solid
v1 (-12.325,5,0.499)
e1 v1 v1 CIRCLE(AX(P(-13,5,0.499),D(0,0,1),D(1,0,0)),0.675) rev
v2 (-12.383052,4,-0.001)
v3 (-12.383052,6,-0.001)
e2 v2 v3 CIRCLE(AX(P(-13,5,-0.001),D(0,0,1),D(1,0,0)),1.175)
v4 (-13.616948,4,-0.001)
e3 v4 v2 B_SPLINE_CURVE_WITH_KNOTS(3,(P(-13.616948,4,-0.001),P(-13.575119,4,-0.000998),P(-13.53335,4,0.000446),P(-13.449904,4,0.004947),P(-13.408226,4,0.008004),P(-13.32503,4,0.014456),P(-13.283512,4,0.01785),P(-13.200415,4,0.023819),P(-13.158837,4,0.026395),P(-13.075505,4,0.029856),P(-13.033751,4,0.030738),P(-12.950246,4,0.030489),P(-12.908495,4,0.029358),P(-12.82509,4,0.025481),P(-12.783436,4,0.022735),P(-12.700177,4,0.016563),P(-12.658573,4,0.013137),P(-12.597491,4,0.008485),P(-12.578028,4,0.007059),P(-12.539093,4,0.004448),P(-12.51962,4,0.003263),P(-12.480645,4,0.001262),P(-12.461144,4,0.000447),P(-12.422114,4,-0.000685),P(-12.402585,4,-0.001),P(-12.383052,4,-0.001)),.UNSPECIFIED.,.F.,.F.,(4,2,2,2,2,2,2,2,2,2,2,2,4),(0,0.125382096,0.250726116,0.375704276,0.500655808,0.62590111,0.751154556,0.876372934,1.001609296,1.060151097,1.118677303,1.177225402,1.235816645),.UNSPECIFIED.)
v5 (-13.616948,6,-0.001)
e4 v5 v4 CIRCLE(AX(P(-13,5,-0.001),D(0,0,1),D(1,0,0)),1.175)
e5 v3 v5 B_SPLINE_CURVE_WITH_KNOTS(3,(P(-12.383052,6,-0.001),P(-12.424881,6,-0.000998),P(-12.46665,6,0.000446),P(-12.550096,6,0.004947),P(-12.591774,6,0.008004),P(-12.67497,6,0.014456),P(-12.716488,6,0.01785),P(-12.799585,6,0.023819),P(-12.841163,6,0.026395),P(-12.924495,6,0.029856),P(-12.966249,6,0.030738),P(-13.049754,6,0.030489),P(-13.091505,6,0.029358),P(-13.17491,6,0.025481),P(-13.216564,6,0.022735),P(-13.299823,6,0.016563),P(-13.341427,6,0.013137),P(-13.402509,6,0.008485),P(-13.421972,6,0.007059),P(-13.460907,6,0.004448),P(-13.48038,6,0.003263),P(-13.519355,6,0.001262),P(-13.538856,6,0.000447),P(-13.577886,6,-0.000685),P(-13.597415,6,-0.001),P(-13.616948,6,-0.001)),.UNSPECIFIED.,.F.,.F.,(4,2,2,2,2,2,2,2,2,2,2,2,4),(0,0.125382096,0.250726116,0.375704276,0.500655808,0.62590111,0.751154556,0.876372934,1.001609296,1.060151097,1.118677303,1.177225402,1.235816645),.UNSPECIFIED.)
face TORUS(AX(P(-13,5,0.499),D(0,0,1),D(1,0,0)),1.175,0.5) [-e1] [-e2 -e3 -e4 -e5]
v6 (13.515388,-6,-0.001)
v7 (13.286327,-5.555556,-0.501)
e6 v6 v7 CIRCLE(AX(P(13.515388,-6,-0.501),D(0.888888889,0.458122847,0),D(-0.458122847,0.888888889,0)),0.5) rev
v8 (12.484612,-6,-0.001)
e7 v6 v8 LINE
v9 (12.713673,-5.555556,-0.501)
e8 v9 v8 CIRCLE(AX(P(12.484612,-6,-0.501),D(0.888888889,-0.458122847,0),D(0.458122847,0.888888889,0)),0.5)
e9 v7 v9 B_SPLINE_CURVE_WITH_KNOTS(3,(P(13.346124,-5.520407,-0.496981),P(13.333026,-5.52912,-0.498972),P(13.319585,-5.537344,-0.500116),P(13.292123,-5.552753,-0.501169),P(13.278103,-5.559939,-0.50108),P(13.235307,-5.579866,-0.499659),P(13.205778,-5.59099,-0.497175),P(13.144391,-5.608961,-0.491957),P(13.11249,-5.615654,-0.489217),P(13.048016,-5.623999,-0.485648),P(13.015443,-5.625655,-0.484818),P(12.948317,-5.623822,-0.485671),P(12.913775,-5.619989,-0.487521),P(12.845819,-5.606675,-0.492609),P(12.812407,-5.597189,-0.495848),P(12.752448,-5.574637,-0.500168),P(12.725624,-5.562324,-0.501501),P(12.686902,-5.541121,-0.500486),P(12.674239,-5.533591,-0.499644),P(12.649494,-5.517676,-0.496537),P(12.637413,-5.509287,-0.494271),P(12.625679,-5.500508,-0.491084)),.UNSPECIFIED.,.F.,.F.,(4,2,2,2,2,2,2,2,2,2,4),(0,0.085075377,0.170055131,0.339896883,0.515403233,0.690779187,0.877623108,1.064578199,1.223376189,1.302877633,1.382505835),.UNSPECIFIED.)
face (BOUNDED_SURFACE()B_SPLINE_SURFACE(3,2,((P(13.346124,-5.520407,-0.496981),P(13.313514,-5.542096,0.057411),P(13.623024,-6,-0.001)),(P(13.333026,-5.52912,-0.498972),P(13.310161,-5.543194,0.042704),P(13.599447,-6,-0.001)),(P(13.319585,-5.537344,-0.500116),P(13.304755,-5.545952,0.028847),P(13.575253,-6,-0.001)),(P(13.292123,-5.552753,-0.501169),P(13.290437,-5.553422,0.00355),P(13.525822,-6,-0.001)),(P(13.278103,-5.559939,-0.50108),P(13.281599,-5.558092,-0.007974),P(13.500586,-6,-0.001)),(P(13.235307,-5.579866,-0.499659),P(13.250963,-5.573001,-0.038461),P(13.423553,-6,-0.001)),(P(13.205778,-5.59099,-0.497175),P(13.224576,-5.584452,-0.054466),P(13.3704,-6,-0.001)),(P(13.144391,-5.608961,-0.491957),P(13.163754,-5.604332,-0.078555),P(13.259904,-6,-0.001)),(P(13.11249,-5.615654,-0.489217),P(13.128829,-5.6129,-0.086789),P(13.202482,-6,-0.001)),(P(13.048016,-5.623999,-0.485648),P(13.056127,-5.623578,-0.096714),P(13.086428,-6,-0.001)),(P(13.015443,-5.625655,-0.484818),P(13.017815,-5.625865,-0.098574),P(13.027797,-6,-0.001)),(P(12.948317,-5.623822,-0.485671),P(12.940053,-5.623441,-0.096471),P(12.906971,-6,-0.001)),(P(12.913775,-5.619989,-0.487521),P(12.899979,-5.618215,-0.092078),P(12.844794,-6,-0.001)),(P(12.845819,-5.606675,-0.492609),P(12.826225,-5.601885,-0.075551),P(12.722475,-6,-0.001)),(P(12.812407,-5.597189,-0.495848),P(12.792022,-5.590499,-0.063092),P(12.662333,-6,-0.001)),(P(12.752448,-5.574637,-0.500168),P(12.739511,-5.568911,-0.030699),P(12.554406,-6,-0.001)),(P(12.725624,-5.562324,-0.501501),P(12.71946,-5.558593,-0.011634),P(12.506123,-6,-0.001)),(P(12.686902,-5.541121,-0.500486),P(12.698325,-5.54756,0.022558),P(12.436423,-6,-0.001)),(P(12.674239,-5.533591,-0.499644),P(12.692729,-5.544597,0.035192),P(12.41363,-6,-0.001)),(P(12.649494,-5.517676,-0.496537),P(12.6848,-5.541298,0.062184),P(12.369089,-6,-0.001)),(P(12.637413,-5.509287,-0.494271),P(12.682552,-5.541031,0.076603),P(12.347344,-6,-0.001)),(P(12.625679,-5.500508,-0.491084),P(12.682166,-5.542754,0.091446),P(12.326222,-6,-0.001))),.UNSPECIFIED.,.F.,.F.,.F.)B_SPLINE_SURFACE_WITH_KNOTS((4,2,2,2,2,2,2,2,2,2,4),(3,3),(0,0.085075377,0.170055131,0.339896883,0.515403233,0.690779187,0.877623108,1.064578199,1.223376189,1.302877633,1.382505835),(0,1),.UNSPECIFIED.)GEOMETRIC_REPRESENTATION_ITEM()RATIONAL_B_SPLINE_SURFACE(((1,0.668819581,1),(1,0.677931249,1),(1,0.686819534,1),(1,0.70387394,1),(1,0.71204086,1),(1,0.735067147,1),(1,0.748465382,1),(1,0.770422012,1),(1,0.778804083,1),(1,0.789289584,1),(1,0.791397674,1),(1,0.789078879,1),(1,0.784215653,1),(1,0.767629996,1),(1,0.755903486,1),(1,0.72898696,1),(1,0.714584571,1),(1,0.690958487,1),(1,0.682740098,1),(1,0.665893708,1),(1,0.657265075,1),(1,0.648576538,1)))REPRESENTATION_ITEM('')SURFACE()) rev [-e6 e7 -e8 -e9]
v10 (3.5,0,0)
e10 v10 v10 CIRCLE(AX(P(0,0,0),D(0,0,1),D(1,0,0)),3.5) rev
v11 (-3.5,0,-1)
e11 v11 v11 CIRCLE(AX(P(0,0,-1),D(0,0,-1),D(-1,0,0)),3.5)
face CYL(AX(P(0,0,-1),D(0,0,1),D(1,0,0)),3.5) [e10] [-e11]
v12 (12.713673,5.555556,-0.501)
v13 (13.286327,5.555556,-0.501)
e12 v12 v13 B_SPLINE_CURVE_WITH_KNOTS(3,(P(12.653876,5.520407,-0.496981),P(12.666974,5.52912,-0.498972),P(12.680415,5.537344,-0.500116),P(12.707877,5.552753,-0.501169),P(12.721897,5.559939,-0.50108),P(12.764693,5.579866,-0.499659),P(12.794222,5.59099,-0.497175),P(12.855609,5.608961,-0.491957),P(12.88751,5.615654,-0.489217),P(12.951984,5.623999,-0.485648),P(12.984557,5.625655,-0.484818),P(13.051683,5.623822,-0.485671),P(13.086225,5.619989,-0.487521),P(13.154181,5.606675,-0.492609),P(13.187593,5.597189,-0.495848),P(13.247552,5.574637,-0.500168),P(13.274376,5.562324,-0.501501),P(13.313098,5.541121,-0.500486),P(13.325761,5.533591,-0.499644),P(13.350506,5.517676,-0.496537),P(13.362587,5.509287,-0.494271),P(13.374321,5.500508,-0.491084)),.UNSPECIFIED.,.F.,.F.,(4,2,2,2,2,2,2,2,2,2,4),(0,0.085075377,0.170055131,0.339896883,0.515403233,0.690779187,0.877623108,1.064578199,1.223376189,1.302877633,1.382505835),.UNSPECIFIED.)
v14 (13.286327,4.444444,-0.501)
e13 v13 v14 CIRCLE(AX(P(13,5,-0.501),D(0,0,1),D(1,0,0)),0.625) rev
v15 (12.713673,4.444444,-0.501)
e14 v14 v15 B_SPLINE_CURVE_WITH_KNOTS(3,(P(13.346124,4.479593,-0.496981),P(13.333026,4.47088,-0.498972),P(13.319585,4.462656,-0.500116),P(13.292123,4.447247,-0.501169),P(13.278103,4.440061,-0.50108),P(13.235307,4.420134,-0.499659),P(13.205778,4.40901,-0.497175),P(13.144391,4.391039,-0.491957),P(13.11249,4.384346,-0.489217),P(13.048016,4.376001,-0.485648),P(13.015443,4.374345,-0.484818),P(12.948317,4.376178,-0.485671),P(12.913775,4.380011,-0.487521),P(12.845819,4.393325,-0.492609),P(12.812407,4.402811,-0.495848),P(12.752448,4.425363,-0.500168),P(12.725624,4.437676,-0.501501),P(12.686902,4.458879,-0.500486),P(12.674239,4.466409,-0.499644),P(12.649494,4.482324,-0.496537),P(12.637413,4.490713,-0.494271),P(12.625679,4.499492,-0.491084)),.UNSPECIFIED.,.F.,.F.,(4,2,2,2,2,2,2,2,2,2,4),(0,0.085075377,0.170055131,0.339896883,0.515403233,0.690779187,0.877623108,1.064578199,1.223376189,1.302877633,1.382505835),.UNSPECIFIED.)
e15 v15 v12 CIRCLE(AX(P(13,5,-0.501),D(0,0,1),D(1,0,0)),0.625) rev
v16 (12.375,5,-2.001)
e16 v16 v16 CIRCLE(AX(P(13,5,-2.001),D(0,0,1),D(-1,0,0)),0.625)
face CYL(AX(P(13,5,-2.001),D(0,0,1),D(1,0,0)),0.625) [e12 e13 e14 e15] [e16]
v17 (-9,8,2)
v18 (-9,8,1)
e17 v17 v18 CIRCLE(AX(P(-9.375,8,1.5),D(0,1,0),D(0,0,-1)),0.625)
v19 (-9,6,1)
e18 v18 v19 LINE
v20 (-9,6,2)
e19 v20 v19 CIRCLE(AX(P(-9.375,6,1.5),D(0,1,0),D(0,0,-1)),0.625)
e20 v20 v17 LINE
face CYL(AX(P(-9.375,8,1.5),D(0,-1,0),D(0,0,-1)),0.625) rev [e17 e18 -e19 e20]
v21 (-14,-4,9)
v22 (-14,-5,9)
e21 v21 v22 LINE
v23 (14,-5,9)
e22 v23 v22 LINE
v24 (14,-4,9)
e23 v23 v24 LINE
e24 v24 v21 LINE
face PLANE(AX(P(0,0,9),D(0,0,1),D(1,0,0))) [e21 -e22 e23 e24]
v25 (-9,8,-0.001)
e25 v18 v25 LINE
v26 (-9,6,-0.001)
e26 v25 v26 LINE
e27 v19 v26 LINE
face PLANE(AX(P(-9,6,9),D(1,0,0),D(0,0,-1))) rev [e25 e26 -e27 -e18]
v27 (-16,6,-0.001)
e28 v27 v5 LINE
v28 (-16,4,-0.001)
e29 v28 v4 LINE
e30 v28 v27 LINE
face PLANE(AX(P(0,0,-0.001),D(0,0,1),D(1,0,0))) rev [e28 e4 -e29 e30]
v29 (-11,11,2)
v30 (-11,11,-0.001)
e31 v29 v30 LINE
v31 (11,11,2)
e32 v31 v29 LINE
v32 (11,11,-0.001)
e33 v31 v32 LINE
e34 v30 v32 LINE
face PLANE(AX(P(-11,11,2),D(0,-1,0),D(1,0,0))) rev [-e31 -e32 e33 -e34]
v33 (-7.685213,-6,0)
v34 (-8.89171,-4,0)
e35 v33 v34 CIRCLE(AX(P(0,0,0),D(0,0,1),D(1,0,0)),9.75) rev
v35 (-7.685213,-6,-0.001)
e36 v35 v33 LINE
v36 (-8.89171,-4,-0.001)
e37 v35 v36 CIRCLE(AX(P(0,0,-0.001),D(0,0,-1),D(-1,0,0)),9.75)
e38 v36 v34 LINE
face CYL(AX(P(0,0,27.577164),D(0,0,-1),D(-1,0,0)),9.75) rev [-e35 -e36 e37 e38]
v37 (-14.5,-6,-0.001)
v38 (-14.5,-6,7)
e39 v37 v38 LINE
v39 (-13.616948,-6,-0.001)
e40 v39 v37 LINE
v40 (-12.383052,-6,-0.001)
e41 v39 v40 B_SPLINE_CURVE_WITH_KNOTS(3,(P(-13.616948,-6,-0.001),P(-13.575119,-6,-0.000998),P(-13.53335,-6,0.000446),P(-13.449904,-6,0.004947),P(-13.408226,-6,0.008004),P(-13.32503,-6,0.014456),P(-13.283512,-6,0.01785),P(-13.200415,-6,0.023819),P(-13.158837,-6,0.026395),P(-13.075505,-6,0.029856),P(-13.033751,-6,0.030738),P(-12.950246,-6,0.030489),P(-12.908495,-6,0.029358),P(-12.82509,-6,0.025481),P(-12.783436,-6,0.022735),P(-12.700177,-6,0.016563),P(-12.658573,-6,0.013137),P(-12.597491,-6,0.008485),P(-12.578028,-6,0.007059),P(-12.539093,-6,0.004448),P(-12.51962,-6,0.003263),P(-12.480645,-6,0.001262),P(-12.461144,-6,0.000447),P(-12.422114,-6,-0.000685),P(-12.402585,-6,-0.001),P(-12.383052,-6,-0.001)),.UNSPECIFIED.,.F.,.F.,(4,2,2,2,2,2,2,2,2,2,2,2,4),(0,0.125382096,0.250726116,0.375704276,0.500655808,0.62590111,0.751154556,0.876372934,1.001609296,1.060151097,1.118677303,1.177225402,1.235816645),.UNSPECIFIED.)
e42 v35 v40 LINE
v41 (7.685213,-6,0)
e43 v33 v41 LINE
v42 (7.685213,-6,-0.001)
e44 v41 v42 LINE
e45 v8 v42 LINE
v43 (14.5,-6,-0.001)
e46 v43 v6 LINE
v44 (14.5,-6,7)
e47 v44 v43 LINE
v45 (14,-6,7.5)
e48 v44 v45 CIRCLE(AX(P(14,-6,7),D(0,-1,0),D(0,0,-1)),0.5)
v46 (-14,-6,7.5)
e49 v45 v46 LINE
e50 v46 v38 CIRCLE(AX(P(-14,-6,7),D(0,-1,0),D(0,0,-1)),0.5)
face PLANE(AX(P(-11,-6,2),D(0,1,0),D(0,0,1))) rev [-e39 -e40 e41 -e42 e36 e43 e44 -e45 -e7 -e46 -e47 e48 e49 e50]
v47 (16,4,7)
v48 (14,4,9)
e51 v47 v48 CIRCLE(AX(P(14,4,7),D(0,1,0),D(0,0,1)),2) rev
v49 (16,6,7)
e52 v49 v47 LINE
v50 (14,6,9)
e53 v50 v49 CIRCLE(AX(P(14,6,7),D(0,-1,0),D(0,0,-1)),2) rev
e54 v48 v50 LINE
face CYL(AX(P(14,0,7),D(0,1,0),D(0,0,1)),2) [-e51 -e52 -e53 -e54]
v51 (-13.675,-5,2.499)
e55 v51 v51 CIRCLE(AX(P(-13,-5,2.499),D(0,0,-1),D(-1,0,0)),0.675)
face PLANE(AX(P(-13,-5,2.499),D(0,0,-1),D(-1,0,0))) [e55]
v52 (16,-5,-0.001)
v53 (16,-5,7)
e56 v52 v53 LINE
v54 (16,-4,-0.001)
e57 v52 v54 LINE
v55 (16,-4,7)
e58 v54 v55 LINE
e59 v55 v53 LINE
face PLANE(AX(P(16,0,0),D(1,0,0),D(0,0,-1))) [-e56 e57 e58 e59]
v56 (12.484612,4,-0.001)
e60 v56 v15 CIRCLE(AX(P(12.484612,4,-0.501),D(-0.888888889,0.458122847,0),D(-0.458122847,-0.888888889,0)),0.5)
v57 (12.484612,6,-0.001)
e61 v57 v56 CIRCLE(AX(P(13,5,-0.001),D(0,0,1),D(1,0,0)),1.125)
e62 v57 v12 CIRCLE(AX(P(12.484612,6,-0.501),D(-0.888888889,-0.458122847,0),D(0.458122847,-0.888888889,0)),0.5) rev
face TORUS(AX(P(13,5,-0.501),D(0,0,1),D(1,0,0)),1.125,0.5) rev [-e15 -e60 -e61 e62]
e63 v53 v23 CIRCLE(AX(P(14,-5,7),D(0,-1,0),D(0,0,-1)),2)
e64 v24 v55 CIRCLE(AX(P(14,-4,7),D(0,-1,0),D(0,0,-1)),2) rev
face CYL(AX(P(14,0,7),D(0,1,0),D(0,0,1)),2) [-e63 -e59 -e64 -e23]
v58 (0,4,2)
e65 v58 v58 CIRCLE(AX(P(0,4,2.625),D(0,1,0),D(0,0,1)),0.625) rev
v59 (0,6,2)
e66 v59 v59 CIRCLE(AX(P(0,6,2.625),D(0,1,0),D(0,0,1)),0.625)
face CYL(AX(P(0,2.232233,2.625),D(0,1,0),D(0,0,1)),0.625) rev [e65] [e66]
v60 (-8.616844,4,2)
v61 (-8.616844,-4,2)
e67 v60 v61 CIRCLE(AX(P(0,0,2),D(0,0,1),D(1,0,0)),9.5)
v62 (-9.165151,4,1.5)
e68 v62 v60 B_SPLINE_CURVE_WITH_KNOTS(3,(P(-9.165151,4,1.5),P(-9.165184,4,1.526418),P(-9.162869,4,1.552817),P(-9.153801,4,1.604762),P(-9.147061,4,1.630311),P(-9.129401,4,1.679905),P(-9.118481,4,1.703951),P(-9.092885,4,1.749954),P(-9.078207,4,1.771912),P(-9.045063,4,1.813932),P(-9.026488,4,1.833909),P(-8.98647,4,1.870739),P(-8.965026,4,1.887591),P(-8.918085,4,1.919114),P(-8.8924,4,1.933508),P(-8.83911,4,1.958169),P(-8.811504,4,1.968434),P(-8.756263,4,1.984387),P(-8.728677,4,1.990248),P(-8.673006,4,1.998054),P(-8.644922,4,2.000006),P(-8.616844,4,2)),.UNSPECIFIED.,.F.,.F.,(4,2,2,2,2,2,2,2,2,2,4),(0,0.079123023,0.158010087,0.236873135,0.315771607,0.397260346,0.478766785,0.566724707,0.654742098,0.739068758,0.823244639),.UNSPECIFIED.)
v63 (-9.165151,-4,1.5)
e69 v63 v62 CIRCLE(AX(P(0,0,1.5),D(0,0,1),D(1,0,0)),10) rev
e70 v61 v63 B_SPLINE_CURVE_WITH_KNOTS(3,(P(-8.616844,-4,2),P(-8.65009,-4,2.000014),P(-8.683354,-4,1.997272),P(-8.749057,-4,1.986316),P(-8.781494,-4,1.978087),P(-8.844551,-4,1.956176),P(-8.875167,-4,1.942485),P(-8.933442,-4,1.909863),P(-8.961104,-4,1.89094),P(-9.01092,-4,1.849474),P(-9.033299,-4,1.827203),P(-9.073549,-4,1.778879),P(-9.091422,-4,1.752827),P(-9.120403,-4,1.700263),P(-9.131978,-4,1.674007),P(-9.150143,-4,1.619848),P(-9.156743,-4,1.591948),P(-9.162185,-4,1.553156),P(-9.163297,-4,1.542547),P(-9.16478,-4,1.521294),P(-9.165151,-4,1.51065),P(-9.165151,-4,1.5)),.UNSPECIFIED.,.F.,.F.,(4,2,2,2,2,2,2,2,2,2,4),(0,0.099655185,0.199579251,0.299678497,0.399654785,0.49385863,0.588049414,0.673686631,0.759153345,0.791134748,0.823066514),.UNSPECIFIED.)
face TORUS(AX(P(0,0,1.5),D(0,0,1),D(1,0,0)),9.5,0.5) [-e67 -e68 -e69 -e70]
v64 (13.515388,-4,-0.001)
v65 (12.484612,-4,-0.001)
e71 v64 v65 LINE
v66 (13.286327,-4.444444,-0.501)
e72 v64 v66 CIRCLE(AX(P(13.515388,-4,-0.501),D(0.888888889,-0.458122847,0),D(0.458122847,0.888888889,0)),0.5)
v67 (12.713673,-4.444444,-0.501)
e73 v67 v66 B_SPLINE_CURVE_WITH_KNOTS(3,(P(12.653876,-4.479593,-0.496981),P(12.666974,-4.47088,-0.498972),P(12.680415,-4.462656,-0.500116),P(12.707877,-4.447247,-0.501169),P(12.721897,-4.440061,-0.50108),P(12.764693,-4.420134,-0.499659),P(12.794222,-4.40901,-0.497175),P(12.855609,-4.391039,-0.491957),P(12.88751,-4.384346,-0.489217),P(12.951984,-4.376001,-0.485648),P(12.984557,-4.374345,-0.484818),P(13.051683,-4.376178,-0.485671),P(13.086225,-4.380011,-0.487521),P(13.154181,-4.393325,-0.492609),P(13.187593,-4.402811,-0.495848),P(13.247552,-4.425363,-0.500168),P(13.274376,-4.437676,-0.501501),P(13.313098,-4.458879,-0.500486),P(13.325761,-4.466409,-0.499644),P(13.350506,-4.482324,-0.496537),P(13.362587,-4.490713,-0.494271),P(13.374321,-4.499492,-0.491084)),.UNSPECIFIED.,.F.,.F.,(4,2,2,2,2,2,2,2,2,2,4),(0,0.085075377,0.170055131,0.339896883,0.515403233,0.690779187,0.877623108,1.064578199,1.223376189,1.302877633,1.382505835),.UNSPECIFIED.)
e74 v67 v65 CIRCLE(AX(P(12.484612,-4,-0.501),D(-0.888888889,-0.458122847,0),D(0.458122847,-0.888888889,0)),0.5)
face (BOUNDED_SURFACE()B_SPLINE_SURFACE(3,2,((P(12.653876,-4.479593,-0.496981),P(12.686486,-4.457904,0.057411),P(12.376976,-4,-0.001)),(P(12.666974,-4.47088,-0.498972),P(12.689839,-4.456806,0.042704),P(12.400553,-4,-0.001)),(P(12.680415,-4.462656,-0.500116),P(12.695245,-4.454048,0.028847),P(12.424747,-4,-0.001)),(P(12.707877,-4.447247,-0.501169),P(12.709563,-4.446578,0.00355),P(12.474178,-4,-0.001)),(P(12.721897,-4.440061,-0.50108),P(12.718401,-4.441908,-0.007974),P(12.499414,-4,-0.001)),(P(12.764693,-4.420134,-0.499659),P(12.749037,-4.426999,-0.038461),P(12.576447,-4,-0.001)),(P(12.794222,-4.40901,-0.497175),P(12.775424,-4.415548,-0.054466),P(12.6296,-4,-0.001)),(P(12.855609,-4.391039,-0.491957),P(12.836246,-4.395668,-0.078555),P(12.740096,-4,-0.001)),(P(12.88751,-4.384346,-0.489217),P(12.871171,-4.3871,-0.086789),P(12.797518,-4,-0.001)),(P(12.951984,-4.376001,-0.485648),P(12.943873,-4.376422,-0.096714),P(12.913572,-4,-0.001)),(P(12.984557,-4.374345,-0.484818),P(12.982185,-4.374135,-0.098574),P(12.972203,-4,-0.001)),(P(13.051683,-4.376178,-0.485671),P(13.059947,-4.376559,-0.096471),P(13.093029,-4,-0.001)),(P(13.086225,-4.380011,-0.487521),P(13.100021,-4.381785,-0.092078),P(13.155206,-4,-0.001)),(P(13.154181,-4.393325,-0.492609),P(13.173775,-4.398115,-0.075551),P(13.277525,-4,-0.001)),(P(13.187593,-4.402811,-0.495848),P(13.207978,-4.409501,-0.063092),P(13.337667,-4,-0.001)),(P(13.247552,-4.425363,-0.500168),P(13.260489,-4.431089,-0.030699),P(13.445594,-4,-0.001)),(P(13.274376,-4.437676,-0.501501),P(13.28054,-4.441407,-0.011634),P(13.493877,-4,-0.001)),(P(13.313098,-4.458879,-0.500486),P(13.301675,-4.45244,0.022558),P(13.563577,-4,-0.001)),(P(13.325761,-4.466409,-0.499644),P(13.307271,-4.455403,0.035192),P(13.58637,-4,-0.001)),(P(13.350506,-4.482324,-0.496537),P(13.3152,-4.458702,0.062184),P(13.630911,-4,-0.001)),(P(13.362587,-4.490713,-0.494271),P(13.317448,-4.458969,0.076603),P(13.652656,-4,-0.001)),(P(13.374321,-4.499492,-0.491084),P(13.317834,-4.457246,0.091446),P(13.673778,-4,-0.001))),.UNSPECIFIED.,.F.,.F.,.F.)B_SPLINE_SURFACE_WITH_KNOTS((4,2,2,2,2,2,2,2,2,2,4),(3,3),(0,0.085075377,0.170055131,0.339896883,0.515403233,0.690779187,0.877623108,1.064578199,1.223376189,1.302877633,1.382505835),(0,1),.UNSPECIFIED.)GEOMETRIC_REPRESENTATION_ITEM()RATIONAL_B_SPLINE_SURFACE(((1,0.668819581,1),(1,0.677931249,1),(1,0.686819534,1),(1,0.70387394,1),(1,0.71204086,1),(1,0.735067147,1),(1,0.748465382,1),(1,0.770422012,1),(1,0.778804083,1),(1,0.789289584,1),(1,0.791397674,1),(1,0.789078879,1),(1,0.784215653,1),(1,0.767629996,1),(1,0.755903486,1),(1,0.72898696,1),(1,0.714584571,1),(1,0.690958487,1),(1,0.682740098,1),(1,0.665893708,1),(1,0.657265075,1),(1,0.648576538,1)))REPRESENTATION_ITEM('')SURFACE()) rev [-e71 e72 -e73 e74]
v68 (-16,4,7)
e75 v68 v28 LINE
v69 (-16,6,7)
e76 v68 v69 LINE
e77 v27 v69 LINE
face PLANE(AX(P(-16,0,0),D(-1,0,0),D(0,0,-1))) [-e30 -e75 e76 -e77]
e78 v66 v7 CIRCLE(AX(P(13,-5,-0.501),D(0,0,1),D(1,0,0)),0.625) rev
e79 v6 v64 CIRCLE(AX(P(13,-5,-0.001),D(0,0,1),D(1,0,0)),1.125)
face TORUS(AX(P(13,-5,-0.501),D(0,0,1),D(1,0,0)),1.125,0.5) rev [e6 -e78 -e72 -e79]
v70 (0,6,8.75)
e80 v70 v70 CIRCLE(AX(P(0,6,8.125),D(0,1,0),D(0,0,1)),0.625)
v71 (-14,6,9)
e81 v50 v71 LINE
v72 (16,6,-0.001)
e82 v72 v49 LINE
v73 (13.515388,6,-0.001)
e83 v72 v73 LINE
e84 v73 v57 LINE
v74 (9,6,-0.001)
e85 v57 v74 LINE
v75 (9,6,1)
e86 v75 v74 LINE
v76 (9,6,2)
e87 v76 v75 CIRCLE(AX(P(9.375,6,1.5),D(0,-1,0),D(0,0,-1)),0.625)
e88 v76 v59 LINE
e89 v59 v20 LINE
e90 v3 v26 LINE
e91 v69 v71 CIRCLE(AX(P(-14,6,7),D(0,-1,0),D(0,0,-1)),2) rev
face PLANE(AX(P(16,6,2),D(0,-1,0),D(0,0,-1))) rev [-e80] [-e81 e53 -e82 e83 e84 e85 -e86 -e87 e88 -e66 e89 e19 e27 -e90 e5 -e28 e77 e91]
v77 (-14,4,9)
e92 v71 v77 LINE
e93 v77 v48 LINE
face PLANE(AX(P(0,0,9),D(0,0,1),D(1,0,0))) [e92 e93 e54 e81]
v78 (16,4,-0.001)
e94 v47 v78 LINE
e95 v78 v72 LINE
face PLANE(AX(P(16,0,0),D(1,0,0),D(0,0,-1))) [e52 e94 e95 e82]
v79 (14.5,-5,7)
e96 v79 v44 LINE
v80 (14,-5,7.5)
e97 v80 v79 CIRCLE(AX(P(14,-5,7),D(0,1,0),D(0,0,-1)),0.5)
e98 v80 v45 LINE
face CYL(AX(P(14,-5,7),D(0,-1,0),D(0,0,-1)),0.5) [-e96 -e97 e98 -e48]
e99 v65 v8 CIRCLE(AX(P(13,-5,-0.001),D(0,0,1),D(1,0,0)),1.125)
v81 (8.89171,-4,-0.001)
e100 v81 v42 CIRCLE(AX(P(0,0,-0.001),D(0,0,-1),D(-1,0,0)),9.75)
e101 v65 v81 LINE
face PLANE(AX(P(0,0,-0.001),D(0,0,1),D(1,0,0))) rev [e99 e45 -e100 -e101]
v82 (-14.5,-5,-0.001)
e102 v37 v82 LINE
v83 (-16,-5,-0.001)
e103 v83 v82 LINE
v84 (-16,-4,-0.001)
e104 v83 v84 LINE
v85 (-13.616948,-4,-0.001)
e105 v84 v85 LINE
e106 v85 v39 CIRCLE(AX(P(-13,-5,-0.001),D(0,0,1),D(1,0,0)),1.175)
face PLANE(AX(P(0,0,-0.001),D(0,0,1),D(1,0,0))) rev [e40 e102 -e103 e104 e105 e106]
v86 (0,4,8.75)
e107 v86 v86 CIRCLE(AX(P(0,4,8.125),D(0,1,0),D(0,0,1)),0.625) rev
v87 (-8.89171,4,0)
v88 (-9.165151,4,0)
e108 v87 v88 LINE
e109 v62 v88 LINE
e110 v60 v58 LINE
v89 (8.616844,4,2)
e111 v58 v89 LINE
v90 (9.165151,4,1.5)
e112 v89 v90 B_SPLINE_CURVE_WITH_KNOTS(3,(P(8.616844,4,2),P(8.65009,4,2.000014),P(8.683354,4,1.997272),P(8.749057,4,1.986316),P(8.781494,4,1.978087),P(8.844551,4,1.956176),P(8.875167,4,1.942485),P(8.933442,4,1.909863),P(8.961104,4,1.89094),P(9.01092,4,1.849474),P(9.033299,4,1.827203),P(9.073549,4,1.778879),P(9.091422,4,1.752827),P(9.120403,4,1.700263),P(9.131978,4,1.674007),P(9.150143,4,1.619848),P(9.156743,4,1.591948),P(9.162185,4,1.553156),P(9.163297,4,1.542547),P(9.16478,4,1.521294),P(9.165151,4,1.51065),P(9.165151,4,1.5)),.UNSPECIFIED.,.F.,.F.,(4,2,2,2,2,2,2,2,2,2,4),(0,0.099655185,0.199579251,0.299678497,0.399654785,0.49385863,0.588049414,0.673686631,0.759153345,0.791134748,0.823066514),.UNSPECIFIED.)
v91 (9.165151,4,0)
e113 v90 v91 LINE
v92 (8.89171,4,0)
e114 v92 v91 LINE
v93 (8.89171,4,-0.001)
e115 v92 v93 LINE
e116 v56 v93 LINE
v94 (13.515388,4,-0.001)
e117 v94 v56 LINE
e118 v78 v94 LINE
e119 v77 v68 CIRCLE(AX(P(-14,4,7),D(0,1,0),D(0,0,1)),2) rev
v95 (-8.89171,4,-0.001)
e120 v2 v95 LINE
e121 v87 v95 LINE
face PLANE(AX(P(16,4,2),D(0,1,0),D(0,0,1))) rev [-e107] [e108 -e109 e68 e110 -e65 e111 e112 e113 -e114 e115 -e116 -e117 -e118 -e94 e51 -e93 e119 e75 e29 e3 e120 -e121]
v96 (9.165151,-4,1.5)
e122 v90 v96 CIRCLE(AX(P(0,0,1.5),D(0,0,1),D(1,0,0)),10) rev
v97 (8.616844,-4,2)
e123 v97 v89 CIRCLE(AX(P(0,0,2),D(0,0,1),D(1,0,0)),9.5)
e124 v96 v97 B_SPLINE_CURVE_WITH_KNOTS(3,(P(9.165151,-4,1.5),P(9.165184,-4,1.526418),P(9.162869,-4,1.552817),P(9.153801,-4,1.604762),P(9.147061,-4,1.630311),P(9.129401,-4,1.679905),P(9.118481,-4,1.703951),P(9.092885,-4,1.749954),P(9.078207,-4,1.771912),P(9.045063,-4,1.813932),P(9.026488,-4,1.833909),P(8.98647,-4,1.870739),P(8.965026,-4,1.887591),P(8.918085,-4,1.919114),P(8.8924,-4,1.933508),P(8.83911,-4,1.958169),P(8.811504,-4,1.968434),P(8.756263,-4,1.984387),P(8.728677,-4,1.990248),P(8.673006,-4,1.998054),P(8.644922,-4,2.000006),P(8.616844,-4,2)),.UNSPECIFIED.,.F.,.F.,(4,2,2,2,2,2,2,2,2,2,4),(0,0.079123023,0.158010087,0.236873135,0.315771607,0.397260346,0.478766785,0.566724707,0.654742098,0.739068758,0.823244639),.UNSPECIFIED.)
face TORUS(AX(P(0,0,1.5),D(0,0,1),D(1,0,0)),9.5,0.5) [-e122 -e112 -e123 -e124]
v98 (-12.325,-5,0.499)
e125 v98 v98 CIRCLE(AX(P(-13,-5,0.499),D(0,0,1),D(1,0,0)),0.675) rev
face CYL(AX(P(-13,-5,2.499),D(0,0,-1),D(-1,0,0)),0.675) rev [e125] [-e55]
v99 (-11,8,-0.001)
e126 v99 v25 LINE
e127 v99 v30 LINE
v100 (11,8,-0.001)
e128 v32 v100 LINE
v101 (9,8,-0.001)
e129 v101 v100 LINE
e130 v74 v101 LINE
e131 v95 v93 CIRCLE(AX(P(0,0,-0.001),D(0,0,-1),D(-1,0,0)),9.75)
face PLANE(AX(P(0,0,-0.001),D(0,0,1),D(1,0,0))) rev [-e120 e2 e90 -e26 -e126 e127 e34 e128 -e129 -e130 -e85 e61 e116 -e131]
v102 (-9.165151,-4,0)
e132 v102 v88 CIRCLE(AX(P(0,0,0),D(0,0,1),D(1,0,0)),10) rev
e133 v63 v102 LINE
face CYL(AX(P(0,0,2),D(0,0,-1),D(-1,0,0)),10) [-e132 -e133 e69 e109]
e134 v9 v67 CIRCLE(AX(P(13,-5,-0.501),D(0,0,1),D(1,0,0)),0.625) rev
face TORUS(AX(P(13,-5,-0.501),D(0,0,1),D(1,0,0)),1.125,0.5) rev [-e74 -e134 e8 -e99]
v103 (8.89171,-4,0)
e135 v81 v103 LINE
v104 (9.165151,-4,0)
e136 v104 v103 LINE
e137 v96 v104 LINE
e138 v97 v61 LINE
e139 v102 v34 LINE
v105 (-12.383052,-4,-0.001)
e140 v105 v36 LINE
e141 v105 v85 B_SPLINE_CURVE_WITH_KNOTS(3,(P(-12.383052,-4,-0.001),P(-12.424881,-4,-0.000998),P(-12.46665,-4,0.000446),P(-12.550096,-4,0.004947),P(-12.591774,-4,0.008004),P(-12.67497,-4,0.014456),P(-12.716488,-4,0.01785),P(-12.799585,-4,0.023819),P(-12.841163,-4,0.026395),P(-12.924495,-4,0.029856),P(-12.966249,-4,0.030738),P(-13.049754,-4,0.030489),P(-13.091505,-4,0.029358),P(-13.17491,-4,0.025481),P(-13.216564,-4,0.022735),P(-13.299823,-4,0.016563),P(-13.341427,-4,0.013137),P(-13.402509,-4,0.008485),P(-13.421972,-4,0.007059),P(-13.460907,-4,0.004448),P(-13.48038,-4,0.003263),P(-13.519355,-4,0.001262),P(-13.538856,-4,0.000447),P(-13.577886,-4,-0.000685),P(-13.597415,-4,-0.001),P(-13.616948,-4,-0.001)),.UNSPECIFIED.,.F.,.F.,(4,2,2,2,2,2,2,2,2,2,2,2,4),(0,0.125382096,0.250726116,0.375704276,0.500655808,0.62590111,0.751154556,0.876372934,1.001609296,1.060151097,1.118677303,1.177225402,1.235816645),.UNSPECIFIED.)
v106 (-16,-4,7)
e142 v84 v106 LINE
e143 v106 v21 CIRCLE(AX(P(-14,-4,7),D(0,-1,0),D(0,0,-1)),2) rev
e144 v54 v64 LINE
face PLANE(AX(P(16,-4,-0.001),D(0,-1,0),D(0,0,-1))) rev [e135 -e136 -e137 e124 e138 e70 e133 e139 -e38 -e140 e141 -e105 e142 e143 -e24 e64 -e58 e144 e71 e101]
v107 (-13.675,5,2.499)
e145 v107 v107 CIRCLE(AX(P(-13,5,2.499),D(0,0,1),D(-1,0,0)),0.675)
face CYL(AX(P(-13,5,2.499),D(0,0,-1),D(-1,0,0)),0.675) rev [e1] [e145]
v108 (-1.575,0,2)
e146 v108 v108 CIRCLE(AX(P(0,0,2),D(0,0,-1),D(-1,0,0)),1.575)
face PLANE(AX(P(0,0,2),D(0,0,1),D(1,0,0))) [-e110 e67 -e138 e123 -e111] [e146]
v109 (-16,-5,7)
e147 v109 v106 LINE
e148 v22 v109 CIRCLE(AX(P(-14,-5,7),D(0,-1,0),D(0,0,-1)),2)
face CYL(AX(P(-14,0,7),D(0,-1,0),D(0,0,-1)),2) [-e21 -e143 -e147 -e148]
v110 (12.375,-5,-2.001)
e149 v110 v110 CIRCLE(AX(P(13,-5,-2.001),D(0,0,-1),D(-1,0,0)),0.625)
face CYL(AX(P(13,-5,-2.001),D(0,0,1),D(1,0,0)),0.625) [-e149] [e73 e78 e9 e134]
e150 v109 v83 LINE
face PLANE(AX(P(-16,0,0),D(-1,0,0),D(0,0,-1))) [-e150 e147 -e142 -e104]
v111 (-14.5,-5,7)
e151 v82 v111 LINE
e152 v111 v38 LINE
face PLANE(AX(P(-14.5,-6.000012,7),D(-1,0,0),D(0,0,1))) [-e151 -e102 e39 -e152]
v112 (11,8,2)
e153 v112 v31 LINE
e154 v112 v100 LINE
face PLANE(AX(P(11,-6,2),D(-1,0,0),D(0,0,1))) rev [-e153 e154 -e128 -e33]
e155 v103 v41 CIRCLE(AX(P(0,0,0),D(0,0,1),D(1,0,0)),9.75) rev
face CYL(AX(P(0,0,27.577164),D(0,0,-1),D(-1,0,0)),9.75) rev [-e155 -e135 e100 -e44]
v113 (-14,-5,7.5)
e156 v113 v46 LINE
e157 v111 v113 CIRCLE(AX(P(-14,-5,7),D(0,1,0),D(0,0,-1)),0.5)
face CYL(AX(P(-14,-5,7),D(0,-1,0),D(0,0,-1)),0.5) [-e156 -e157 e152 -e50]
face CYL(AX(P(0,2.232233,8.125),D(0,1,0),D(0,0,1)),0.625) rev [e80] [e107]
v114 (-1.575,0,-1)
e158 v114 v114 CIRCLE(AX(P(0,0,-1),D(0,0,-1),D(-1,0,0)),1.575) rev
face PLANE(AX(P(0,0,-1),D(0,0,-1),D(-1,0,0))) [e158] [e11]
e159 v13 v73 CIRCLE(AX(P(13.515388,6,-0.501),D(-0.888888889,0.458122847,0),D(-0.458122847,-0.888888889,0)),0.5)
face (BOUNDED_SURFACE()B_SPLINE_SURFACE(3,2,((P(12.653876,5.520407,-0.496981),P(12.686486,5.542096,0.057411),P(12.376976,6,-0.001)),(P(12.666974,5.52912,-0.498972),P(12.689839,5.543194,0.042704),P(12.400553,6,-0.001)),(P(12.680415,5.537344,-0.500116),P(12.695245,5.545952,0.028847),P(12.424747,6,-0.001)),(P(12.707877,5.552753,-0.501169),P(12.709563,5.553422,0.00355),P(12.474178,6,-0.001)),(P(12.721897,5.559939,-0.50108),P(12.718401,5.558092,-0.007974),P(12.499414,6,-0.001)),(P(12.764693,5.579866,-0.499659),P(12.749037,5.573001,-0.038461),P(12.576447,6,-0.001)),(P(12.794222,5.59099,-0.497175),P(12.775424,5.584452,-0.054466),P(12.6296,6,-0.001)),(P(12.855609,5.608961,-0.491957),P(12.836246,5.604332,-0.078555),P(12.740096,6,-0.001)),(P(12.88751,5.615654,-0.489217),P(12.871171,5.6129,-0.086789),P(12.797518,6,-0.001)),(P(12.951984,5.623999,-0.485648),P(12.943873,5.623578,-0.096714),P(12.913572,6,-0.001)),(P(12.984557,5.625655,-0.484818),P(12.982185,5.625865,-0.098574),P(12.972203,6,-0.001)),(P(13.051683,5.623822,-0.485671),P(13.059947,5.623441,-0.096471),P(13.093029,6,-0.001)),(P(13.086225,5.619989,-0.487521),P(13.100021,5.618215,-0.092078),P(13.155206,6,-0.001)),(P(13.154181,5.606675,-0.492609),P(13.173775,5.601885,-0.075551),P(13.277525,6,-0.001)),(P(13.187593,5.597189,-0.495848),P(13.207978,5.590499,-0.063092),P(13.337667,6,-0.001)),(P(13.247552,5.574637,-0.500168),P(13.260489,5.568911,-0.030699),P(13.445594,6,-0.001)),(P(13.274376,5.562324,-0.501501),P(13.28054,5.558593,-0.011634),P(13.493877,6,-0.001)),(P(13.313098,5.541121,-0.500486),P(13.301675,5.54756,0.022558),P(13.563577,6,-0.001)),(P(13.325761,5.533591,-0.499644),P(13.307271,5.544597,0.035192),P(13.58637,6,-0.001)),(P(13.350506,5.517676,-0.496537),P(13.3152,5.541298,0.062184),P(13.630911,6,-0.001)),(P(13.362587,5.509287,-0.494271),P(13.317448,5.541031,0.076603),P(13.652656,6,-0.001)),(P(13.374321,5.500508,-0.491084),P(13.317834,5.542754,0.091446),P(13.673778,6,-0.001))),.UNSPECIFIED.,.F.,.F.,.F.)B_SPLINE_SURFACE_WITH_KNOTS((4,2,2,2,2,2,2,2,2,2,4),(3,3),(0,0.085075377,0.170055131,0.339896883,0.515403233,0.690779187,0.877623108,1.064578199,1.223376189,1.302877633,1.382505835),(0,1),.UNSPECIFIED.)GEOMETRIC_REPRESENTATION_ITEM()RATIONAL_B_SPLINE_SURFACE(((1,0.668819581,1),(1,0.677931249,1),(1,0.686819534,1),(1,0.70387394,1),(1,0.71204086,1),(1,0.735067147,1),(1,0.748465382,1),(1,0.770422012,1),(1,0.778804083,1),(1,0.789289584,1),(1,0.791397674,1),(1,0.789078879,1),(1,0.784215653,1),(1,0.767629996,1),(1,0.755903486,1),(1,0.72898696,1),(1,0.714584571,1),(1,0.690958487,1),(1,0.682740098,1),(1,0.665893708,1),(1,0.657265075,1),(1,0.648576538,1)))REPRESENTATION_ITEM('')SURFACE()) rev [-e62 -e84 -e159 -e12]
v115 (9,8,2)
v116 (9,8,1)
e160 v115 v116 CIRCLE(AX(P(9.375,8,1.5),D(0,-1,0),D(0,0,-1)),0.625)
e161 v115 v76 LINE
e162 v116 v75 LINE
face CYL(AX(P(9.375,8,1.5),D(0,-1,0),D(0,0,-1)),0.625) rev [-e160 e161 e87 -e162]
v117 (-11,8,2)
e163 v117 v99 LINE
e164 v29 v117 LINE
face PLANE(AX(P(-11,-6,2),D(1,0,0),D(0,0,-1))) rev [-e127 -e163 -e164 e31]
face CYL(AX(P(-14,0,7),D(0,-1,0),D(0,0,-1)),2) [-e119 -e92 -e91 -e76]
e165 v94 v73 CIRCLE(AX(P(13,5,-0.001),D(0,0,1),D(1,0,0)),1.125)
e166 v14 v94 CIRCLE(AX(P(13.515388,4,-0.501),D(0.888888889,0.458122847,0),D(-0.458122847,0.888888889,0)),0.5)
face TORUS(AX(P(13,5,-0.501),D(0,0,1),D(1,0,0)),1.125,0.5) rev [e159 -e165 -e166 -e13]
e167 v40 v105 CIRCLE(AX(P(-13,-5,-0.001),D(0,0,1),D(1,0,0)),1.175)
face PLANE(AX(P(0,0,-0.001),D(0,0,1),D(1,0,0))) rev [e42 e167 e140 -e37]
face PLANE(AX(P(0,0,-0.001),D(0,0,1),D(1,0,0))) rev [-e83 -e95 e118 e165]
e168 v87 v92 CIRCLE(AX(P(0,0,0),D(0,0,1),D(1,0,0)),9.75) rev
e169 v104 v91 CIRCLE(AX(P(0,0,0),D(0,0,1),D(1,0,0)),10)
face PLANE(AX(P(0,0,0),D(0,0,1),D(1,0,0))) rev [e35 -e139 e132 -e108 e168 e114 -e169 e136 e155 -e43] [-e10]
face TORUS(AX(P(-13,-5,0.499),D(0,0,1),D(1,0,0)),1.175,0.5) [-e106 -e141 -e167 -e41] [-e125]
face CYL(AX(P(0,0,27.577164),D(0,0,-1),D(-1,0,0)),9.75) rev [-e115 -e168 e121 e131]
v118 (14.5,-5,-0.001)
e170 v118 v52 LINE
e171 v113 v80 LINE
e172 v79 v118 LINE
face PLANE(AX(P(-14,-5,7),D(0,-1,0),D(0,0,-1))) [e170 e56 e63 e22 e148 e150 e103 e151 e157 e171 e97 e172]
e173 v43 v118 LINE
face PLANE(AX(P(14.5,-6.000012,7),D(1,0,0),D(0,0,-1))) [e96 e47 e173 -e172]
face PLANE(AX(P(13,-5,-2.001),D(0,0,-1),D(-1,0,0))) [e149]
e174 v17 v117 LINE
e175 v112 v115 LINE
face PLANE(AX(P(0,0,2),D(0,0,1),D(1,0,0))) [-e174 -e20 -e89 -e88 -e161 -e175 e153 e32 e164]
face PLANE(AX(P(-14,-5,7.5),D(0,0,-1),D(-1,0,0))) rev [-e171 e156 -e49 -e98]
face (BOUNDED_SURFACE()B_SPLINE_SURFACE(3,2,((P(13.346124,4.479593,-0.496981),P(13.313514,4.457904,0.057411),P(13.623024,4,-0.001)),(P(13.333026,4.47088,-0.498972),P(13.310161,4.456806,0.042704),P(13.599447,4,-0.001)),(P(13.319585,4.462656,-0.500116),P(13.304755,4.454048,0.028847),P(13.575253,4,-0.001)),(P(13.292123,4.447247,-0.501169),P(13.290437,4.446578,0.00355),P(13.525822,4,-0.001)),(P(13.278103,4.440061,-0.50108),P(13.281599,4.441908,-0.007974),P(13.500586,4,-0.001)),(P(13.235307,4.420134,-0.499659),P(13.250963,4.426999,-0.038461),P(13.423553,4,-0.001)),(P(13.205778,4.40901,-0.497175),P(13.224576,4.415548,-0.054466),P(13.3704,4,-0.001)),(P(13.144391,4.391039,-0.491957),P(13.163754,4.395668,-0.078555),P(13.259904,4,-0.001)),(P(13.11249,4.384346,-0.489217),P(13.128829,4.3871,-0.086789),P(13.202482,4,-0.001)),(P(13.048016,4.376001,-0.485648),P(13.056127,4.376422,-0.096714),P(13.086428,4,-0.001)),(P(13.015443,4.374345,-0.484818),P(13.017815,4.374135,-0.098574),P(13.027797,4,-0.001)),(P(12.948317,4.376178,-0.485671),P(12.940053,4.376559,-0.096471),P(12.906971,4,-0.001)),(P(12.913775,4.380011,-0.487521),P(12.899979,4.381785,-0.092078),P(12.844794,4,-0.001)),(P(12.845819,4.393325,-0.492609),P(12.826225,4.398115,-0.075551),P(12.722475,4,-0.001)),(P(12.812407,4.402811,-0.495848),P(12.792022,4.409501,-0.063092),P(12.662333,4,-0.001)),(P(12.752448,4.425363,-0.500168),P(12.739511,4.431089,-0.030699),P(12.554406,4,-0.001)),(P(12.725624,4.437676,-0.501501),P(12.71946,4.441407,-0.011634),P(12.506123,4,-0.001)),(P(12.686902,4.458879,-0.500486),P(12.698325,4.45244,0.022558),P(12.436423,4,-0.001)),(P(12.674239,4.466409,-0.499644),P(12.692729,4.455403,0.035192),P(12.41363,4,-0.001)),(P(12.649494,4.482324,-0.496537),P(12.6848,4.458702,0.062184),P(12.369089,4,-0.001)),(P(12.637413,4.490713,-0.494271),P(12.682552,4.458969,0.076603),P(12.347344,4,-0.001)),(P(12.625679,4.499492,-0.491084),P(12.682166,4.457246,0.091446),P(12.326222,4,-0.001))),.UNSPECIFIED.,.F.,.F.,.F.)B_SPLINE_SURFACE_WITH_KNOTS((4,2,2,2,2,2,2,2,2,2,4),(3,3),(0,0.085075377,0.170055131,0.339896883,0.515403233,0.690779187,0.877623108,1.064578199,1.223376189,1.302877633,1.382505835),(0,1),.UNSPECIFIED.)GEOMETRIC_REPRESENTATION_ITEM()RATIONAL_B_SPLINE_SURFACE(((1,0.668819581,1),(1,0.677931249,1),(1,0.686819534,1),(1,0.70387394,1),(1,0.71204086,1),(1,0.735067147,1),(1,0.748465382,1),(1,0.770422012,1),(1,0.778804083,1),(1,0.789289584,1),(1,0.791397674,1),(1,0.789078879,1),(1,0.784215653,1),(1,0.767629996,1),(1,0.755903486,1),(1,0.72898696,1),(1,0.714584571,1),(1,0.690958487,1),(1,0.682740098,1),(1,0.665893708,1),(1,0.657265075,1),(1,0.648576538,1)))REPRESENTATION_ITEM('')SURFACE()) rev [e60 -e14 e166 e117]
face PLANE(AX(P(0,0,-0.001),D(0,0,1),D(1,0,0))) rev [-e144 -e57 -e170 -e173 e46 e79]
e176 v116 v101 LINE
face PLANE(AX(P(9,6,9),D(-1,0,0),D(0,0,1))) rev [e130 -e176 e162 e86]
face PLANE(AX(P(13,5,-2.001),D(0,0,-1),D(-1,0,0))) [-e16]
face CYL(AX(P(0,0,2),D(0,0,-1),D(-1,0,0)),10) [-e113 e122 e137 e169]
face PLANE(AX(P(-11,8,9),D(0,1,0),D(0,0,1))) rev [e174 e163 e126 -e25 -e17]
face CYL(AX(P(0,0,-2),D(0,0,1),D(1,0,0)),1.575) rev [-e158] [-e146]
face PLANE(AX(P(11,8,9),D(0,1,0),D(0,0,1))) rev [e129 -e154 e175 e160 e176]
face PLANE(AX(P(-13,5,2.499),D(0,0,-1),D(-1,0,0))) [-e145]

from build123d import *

# Parameters (mm, degrees)
BOSS_EXTRUDE1_DEPTH     = 2
SKETCH2_R               = 1.575
BOSS_EXTRUDE2_DEPTH     = 4
SKETCH3_R               = 3.5
BOSS_EXTRUDE3_DEPTH     = 1
SKETCH4_W               = 2
SKETCH4_H               = 17
BOSS_EXTRUDE4_DEPTH     = 0.001
SKETCH5_W               = 18
SKETCH5_H               = 2
BOSS_EXTRUDE5_DEPTH     = 0.001
SKETCH6_W               = 2.001
SKETCH6_H               = 2
BOSS_EXTRUDE6_DEPTH     = 5
BOSS_EXTRUDE7_DEPTH     = 0.001
CUT_EXTRUDE1_DEPTH      = 20.519323784
SKETCH9_W               = 2.937742252
SKETCH9_H               = 8
CUT_EXTRUDE2_DEPTH      = 0.001
CUT_EXTRUDE11_START     = -0.001
SKETCH21_R              = 9.75
SKETCH21_R_2            = 3.5
CUT_EXTRUDE11_DEPTH     = 0.001
SKETCH10_W              = 32
SKETCH10_H              = 2
BOSS_EXTRUDE8_DEPTH     = 7
FILLET1_R               = 0.5
SKETCH11_R              = 0.625
BOSS_EXTRUDE9_DEPTH     = 2
SKETCH14_W              = 2
SKETCH14_H              = 2
CUT_EXTRUDE5_DEPTH      = 22.401355237
SKETCH12_R              = 0.675
CUT_EXTRUDE3_DEPTH      = 2.5
CUT_EXTRUDE6_DEPTH      = 2
FILLET2_R               = 0.5
FILLET3_R               = 0.5
FILLET4_R               = 2
CUT_EXTRUDE7_DEPTH      = 26.019992106
CUT_EXTRUDE7_DEPTH_BACK = 1
SKETCH19_R              = 0.625
CUT_EXTRUDE9_DEPTH      = 2


with BuildPart() as part:
    # Sketch1 → Boss-Extrude1 (new body)
    with BuildSketch(Plane.XY):
        Polygon((-11, 6), (-11, 11), (11, 11), (11, 6), (11, -6), (-11, -6), align=None)
    extrude(amount=BOSS_EXTRUDE1_DEPTH)

    # Sketch3 → Boss-Extrude3 (add)
    with BuildSketch(Plane(origin=(0, 0, 0), x_dir=(-1, 0, 0), z_dir=(0, 0, -1))):
        with Locations(Location((0, 0, 0), (0, 0, 180))):
            Circle(SKETCH3_R)
    extrude(amount=BOSS_EXTRUDE3_DEPTH)

    # Sketch4 → Boss-Extrude4 (add)
    with BuildSketch(Plane(origin=(0, 0, 0), x_dir=(-1, 0, 0), z_dir=(0, 0, -1))):
        with Locations((10, 2.5)):
            Rectangle(SKETCH4_W, SKETCH4_H)
        with Locations((-10, 2.5)):
            Rectangle(SKETCH4_W, SKETCH4_H)
    extrude(amount=BOSS_EXTRUDE4_DEPTH)

    # Sketch5 → Boss-Extrude5 (add)
    with BuildSketch(Plane(origin=(0, 0, 0), x_dir=(-1, 0, 0), z_dir=(0, 0, -1))):
        with Locations((0, 10)):
            Rectangle(SKETCH5_W, SKETCH5_H)
    extrude(amount=BOSS_EXTRUDE5_DEPTH)

    # Sketch6 → Boss-Extrude6 (add)
    with BuildSketch(Plane(origin=(11, 0, 0), x_dir=(0, 0, -1), z_dir=(1, 0, 0))):
        with Locations((-0.9995, -5)):
            Rectangle(SKETCH6_W, SKETCH6_H)
        with Locations((-0.9995, 5)):
            Rectangle(SKETCH6_W, SKETCH6_H)
    boss_extrude6 = extrude(amount=BOSS_EXTRUDE6_DEPTH)

    # Mirror1: Boss-Extrude6 across plane
    add(boss_extrude6.mirror(Plane(origin=(0, 0, 0), x_dir=(0, 0, 1), z_dir=(1, 0, 0))))

    # Sketch7 → Boss-Extrude7 (add)
    with BuildSketch(Plane(origin=(0, 0, -0.001), x_dir=(-1, 0, 0), z_dir=(0, 0, -1))):
        with BuildLine():
            ThreePointArc((-6.708203932, -6), (-8.407551231, -3.211398808), (-9, 0))
            Line((-9, 0), (-9, -6))
            Line((-9, -6), (-6.708203932, -6))
        make_face()
        with BuildLine():
            Line((-9, 9), (-9, 0))
            ThreePointArc((-9, 0), (-6.363961031, 6.363961031), (0, 9))
            Line((0, 9), (-9, 9))
        make_face()
    boss_extrude7 = extrude(amount=-BOSS_EXTRUDE7_DEPTH)

    # Sketch8 → Cut-Extrude1 (cut, through all)
    with BuildSketch(Plane(origin=(0, 0, -0.001), x_dir=(-1, 0, 0), z_dir=(0, 0, -1))):
        with BuildLine():
            Line((-11, 4), (-9.16515139, 4))
            ThreePointArc((-9.16515139, 4), (-10, 0), (-9.16515139, -4))
            Line((-9.16515139, -4), (-11, -4))
            Line((-11, -4), (-11, 4))
        make_face()
    cut_extrude1 = extrude(amount=-CUT_EXTRUDE1_DEPTH, mode=Mode.SUBTRACT)

    # Sketch9 → Cut-Extrude2 (cut)
    with BuildSketch(Plane(origin=(0, 0, -0.001), x_dir=(-1, 0, 0), z_dir=(0, 0, -1))):
        with Locations((-9.531128874, 0)):
            Rectangle(SKETCH9_W, SKETCH9_H)
    cut_extrude2 = extrude(amount=-CUT_EXTRUDE2_DEPTH, mode=Mode.SUBTRACT)

    # Mirror2: Boss-Extrude7, Cut-Extrude1, Cut-Extrude2 across plane
    add(boss_extrude7.mirror(Plane(origin=(0, 0, 0), x_dir=(0, 0, 1), z_dir=(1, 0, 0))))
    add(cut_extrude1.mirror(Plane(origin=(0, 0, 0), x_dir=(0, 0, 1), z_dir=(1, 0, 0))), mode=Mode.SUBTRACT)
    add(cut_extrude2.mirror(Plane(origin=(0, 0, 0), x_dir=(0, 0, 1), z_dir=(1, 0, 0))), mode=Mode.SUBTRACT)

    # Sketch21 → Cut-Extrude11 (cut)
    with BuildSketch(Plane(origin=(0, 0, -0.001), x_dir=(-1, 0, 0), z_dir=(0, 0, -1)).offset(CUT_EXTRUDE11_START)):
        Circle(SKETCH21_R)
        with Locations(Location((0, 0, 0), (0, 0, 180))):
            Circle(SKETCH21_R_2, mode=Mode.SUBTRACT)
    extrude(amount=CUT_EXTRUDE11_DEPTH, mode=Mode.SUBTRACT)

    # Sketch10 → Boss-Extrude8 (add)
    with BuildSketch(Plane.XY.offset(2)):
        with Locations((0, -5)):
            Rectangle(SKETCH10_W, SKETCH10_H)
        with Locations((0, 5)):
            Rectangle(SKETCH10_W, SKETCH10_H)
    extrude(amount=BOSS_EXTRUDE8_DEPTH)

    # Fillet1
    fillet1_edges = [part.edges().sort_by_distance(p)[0] for p in [
        (10, 0, 2),
        (-10, 0, 2),
    ]]
    fillet(fillet1_edges, radius=FILLET1_R)

    # Sketch11 → Boss-Extrude9 (add)
    with BuildSketch(Plane(origin=(0, 0, -0.001), x_dir=(-1, 0, 0), z_dir=(0, 0, -1))):
        with Locations(Location((-13, -5, 0), (0, 0, 180))):
            Circle(SKETCH11_R)
    boss_extrude9 = extrude(amount=BOSS_EXTRUDE9_DEPTH)

    # Sketch14 → Cut-Extrude5 (cut, through all)
    with BuildSketch(Plane(origin=(0, 0, -0.001), x_dir=(-1, 0, 0), z_dir=(0, 0, -1))):
        with Locations((10, 7)):
            Rectangle(SKETCH14_W, SKETCH14_H)
        with Locations((-10, 7)):
            Rectangle(SKETCH14_W, SKETCH14_H)
    extrude(amount=-CUT_EXTRUDE5_DEPTH, mode=Mode.SUBTRACT)

    # Sketch12 → Cut-Extrude3 (cut)
    with BuildSketch(Plane(origin=(0, 0, -0.001), x_dir=(-1, 0, 0), z_dir=(0, 0, -1))):
        with Locations((13, -5)):
            Circle(SKETCH12_R)
    cut_extrude3 = extrude(amount=-CUT_EXTRUDE3_DEPTH, mode=Mode.SUBTRACT)

    # Sketch16 → Cut-Extrude6 (cut)
    with BuildSketch(Plane(origin=(0, 6, 0), x_dir=(1, 0, 0), z_dir=(0, 1, 0))):
        with BuildLine():
            Line((-9, -1), (-9, -2))
            ThreePointArc((-9, -2), (-8.75, -1.5), (-9, -1))
        make_face()
    cut_extrude6 = extrude(amount=CUT_EXTRUDE6_DEPTH, mode=Mode.SUBTRACT)

    # Mirror3: Boss-Extrude9, Cut-Extrude3 across plane
    add(boss_extrude9.mirror(Plane.ZX))
    add(cut_extrude3.mirror(Plane.ZX), mode=Mode.SUBTRACT)

    # Mirror4: Cut-Extrude6 across plane
    add(cut_extrude6.mirror(Plane(origin=(0, 0, 0), x_dir=(0, 0, 1), z_dir=(1, 0, 0))), mode=Mode.SUBTRACT)

    # Fillet2
    fillet2_edges = [part.edges().sort_by_distance(p)[0] for p in [
        (12.375, -5, -0.001),
        (12.375, 5, -0.001),
    ]]
    fillet(fillet2_edges, radius=FILLET2_R)

    # Fillet3
    # the kernel refuses this fillet: 0.5 mm, written as the material it takes off along each edge
    with BuildSketch(Plane(origin=(-13, -5, -0.001), x_dir=(-1, 0, 0), z_dir=(0, -1, 0))) as fillet3_piece_1:
        with BuildLine():
            CenterArc((0.675 + FILLET3_R, -FILLET3_R), FILLET3_R, 90, 90)
            Line((0.675, -FILLET3_R), (0.675, 0))
            Line((0.675, 0), (0.675 + FILLET3_R, 0))
        make_face()
    revolve(axis=Axis((-13, -5, -0.001), (0, 0, -1)), mode=Mode.SUBTRACT)
    with BuildSketch(Plane(origin=(-13, 5, -0.001), x_dir=(-1, 0, 0), z_dir=(0, 1, 0))) as fillet3_piece_2:
        with BuildLine():
            CenterArc((0.675 + FILLET3_R, FILLET3_R), FILLET3_R, 180, 90)
            Line((0.675, FILLET3_R), (0.675, 0))
            Line((0.675, 0), (0.675 + FILLET3_R, 0))
        make_face()
    revolve(axis=Axis((-13, 5, -0.001), (0, 0, 1)), mode=Mode.SUBTRACT)

    # Fillet4
    fillet4_edges = [part.edges().sort_by_distance(p)[0] for p in [
        (16, -5, 9),
        (-16, -5, 9),
        (-16, 5, 9),
        (16, 5, 9),
    ]]
    fillet(fillet4_edges, radius=FILLET4_R)

    # Sketch17 → Cut-Extrude7 (cut, two sides: drawn at the far end of the back side and taken through both)
    with BuildSketch(Plane.XZ.offset(6).offset(-CUT_EXTRUDE7_DEPTH_BACK)):
        with BuildLine():
            Line((-16, 7), (-16, -0.001))
            Line((-16, -0.001), (-14.5, -0.001))
            Line((-14.5, -0.001), (-14.5, 7))
            ThreePointArc((-14.5, 7), (-14.353553391, 7.353553391), (-14, 7.5))
            Line((-14, 7.5), (14, 7.5))
            ThreePointArc((14, 7.5), (14.353553391, 7.353553391), (14.5, 7))
            Line((14.5, 7), (14.5, -0.001))
            Line((14.5, -0.001), (16, -0.001))
            Line((16, -0.001), (16, 7))
            ThreePointArc((16, 7), (15.414213562, 8.414213562), (14, 9))
            Line((14, 9), (-14, 9))
            ThreePointArc((-14, 9), (-15.414213562, 8.414213562), (-16, 7))
        make_face()
    extrude(amount=CUT_EXTRUDE7_DEPTH + CUT_EXTRUDE7_DEPTH_BACK, mode=Mode.SUBTRACT)

    # Sketch19 → Cut-Extrude9 (cut)
    with BuildSketch(Plane(origin=(0, 6, 0), x_dir=(1, 0, 0), z_dir=(0, 1, 0))):
        with Locations(Location((0, -2.625, 0), (0, 0, 90))):
            Circle(SKETCH19_R)
        with Locations(Location((0, -8.125, 0), (0, 0, 270))):
            Circle(SKETCH19_R)
    extrude(amount=-CUT_EXTRUDE9_DEPTH, mode=Mode.SUBTRACT)


with BuildPart() as body_2:
    # Sketch2 → Boss-Extrude2 (new body)
    with BuildSketch(Plane(origin=(0, 0, 2), x_dir=(-1, 0, 0), z_dir=(0, 0, -1))):
        Circle(SKETCH2_R)
    extrude(amount=BOSS_EXTRUDE2_DEPTH)


with BuildPart() as part_1:
    add(part.part)

    # Combine2: cut body 2
    add(body_2.part, mode=Mode.SUBTRACT)


solid = part_1.part
